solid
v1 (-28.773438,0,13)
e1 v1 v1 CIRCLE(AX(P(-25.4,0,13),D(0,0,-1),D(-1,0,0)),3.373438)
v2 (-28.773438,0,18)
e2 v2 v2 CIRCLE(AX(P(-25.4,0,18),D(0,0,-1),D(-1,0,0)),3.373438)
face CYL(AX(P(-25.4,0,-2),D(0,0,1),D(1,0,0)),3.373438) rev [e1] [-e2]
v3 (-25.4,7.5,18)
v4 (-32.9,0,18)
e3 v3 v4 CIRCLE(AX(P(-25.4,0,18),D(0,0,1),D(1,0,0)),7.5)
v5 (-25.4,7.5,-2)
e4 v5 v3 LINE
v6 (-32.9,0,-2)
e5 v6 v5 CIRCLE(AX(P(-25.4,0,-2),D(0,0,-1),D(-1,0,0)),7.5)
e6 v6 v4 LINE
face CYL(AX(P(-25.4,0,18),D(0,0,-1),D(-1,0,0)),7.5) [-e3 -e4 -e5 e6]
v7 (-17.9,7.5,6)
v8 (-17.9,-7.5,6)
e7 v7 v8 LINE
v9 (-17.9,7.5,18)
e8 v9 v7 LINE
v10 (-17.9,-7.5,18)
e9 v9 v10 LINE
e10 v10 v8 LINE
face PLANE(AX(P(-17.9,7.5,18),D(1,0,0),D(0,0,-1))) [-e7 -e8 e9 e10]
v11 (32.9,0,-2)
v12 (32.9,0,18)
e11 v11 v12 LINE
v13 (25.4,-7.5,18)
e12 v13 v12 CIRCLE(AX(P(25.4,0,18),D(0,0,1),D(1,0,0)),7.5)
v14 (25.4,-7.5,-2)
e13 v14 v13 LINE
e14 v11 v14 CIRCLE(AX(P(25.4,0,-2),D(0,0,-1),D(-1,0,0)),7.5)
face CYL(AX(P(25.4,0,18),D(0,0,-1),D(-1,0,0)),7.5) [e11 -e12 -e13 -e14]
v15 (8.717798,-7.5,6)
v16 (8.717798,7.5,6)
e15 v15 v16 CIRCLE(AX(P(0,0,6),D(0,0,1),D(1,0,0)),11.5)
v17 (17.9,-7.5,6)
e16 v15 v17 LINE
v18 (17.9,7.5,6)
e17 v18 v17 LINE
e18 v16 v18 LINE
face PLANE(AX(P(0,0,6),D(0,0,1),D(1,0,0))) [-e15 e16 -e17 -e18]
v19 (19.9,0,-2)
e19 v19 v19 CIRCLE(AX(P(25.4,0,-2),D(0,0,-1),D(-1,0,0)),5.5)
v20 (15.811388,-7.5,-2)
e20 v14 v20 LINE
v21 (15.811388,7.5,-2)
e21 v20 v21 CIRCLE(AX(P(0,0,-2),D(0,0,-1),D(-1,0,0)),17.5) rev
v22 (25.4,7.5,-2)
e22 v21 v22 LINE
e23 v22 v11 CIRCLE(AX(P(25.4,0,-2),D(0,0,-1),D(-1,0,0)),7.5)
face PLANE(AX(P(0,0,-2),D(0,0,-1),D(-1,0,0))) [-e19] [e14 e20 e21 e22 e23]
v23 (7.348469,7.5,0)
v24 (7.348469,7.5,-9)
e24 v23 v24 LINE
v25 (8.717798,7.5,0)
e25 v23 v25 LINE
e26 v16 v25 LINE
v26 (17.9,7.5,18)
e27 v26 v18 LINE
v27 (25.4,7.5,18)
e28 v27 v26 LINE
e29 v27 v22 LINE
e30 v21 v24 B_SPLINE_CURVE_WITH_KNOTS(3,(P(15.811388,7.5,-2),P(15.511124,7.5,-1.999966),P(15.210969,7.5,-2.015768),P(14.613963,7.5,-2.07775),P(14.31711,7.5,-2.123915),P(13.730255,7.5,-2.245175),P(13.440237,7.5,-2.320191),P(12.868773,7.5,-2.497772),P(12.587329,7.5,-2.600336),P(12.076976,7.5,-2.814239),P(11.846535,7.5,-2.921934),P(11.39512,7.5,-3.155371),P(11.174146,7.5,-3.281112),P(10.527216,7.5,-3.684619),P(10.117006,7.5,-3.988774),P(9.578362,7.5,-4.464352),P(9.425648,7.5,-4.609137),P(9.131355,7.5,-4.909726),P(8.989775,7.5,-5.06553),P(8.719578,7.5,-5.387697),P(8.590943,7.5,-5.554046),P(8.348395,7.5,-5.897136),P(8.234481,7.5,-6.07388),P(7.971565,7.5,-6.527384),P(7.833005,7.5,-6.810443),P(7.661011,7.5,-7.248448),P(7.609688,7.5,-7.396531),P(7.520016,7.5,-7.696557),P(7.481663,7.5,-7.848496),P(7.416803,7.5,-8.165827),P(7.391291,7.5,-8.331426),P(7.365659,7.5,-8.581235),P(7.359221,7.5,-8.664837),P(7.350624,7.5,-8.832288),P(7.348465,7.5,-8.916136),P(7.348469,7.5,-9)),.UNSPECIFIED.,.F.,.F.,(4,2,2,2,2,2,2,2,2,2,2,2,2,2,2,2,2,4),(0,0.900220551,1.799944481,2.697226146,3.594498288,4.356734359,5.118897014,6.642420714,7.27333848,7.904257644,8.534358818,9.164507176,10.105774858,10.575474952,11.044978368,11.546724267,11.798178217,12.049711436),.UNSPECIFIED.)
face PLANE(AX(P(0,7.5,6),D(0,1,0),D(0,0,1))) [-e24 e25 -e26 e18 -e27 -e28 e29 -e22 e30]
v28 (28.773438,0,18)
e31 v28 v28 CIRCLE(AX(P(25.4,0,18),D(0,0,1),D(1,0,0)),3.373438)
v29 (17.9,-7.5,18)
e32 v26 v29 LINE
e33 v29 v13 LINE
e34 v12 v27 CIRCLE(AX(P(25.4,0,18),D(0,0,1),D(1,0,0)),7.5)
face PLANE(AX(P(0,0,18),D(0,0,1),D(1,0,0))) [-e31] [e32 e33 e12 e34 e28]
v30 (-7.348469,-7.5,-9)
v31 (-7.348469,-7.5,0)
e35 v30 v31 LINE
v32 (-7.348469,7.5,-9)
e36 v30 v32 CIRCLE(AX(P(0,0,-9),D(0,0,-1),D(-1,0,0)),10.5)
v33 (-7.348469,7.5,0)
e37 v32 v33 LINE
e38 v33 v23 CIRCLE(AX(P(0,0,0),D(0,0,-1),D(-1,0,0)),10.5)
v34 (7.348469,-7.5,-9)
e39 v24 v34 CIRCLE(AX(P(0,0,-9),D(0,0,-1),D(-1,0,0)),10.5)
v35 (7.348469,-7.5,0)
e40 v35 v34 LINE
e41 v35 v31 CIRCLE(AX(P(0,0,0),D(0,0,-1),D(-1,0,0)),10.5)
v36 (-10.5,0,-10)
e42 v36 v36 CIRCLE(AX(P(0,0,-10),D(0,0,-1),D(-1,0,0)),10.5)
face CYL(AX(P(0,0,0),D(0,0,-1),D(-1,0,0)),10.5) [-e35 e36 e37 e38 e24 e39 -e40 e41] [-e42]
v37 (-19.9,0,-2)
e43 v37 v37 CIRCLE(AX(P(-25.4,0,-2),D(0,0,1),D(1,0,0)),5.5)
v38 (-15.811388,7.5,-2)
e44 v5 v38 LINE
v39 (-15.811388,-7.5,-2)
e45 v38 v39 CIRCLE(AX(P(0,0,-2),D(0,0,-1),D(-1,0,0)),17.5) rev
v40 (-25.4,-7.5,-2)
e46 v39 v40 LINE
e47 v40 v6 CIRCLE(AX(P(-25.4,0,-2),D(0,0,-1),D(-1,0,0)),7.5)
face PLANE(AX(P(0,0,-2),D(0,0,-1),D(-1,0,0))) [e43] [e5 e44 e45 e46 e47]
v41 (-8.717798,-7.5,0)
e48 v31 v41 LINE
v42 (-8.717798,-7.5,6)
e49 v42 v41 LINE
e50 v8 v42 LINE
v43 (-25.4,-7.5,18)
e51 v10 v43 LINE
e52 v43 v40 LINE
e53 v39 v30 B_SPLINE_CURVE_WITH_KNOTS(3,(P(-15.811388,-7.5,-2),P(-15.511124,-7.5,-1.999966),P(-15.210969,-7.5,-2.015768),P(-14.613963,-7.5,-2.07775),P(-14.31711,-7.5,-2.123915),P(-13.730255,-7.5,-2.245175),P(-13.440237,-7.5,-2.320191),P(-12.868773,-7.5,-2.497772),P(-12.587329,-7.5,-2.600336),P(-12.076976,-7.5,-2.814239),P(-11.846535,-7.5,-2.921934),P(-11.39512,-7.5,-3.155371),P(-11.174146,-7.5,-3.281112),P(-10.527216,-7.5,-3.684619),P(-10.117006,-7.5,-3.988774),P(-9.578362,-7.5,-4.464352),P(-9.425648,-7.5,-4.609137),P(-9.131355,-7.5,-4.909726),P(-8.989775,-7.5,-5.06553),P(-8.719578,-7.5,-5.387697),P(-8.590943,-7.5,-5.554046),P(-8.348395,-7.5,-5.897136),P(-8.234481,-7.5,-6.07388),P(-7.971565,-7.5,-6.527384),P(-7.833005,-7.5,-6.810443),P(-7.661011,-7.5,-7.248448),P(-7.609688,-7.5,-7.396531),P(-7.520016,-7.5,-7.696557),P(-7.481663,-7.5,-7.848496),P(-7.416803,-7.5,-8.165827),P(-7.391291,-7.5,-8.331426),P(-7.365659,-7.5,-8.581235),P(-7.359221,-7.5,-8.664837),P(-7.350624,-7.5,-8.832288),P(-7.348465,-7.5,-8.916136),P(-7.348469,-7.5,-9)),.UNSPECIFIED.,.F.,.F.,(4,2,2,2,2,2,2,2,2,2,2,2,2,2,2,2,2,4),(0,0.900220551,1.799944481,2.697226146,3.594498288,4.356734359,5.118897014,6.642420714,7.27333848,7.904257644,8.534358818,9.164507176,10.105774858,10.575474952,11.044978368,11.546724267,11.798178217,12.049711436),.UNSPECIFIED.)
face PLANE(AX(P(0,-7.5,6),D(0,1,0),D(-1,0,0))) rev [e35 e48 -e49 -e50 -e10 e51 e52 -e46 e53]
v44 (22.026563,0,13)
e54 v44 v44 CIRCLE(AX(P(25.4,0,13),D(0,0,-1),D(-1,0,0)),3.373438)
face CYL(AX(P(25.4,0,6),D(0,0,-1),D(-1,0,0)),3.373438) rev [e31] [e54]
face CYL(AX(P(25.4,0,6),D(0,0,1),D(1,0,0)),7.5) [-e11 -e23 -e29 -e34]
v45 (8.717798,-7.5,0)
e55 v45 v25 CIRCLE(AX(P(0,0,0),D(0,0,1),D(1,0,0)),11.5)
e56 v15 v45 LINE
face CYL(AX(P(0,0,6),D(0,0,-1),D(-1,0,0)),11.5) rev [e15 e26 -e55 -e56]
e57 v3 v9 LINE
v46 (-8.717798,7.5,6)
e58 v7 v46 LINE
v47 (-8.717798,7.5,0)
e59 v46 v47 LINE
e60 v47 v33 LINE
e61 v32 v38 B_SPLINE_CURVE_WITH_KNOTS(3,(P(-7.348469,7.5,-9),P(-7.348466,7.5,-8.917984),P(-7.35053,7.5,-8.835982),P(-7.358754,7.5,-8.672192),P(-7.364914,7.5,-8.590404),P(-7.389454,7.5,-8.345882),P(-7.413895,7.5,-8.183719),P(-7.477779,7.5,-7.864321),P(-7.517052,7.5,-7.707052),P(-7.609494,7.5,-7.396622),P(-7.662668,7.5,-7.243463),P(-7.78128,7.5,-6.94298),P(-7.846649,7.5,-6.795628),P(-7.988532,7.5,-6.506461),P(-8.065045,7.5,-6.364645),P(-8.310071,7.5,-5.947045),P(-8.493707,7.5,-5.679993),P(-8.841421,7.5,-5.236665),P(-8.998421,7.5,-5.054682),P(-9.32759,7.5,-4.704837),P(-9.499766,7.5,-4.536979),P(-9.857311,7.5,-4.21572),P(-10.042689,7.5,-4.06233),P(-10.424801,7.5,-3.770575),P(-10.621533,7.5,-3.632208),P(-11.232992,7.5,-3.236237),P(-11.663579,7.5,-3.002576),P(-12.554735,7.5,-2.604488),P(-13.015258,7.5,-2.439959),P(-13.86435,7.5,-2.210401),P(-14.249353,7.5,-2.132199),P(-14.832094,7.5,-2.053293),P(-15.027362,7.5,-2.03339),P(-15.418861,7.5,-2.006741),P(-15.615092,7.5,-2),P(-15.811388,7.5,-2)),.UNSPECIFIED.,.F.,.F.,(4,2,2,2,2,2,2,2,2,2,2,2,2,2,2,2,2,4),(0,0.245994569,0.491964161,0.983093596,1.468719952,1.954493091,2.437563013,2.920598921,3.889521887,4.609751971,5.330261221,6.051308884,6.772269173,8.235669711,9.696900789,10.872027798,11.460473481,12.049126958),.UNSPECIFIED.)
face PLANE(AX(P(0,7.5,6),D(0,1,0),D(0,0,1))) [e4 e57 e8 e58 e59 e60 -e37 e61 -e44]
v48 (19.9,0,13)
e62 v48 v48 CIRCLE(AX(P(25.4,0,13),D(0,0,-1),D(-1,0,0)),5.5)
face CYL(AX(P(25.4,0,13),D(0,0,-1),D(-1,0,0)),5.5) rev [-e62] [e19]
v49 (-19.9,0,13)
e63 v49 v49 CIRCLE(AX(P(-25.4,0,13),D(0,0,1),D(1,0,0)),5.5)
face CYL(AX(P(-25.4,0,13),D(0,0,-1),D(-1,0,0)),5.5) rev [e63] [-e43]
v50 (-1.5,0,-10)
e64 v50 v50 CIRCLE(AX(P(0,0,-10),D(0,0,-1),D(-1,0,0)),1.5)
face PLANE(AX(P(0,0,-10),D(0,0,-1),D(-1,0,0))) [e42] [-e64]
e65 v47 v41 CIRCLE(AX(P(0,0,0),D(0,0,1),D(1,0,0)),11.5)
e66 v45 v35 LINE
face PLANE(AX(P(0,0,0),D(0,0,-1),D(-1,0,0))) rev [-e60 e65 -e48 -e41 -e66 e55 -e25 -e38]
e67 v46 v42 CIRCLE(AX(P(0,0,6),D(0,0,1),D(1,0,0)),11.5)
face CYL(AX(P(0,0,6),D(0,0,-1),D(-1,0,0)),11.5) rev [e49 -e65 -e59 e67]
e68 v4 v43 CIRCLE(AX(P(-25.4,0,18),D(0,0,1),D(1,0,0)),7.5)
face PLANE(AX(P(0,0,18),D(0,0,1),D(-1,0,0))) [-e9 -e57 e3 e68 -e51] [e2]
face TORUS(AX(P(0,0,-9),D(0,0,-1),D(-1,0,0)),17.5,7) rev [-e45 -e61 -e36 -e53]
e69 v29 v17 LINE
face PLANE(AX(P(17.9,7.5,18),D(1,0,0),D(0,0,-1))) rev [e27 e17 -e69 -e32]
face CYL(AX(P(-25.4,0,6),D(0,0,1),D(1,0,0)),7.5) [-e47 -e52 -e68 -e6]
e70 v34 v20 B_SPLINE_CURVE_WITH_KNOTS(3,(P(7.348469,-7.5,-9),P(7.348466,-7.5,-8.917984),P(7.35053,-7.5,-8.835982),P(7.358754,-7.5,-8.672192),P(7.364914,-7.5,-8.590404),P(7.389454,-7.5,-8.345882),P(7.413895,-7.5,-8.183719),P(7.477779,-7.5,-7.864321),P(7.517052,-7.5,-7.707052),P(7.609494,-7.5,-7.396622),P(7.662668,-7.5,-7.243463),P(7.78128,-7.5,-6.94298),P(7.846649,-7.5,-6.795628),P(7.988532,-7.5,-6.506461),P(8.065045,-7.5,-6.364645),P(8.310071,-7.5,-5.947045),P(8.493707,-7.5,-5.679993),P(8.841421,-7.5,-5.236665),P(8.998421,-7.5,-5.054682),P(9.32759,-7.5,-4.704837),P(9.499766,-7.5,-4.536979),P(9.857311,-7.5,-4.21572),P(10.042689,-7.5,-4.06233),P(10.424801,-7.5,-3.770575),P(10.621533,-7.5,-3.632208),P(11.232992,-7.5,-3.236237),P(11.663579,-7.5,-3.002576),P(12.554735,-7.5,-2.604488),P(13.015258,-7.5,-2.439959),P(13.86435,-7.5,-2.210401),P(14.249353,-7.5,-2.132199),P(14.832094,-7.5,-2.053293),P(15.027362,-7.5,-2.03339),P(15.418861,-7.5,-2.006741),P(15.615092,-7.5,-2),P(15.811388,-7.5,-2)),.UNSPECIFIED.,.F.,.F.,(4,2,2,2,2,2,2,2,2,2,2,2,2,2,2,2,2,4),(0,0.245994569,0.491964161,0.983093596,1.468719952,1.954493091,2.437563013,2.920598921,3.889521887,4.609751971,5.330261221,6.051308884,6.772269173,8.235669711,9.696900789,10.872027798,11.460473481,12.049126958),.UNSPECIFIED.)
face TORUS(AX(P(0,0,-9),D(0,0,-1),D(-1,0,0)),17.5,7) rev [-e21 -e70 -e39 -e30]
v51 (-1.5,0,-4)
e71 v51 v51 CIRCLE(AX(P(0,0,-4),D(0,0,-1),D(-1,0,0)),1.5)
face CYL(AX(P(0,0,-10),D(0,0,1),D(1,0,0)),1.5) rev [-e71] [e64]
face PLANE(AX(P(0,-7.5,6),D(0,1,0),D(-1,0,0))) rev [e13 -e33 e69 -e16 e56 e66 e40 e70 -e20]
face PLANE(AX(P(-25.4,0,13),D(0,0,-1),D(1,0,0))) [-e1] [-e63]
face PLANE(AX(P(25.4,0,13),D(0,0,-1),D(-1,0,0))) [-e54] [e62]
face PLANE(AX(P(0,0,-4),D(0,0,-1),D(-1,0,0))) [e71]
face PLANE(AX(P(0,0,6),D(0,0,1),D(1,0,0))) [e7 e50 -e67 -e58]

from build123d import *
from build123d.topology import SkipClean

# Parameters (mm, degrees)
SKETCH1_R             = 3.3734375
BOSS_EXTRUDE1_DEPTH   = 6
BOSS_EXTRUDE1_2_DEPTH = 6
BOSS_EXTRUDE2_START   = 2
SKETCH2_R             = 3.3734375
BOSS_EXTRUDE2_DEPTH   = 2
SKETCH3_R             = 10.5
BOSS_EXTRUDE3_DEPTH   = 2
BOSS_EXTRUDE4_START   = 2
SKETCH4_R             = 10.5
BOSS_EXTRUDE4_DEPTH   = 2
BOSS_EXTRUDE5_START   = 6
SKETCH5_R             = 10.5
SKETCH5_R_2           = 1.5
BOSS_EXTRUDE5_DEPTH   = 6
FILLET1_R             = 7
SKETCH6_W             = 15
SKETCH6_H             = 15
SKETCH6_R             = 3.3734375
BOSS_EXTRUDE6_DEPTH   = 12
SKETCH7_R             = 5.5
CUT_EXTRUDE2_DEPTH    = 15
SKETCH8_W             = 8
SKETCH8_H             = 15
CUT_EXTRUDE3_DEPTH    = 5.2
SKETCH9_W             = 8
SKETCH9_H             = 15
CUT_EXTRUDE4_DEPTH    = 5.2
FILLET2_R             = 7.5


# Some blends are built 0.0001 mm under size
with BuildPart() as part:
    # Sketch1 → Boss-Extrude1 (new body)
    with BuildSketch(Plane.XY):
        with BuildLine():
            ThreePointArc((11.5, 0), (10.782037741, -3.999707758), (8.717797887, -7.5))
            Line((8.717797887, -7.5), (38.1, -7.5))
            Line((38.1, -7.5), (38.1, 7.5))
            Line((38.1, 7.5), (8.717797887, 7.5))
            ThreePointArc((8.717797887, 7.5), (10.782037741, 3.999707758), (11.5, 0))
        make_face()
        with Locations((25.4, 0)):
            Circle(SKETCH1_R, mode=Mode.SUBTRACT)
    extrude(amount=BOSS_EXTRUDE1_DEPTH)



with BuildPart() as body_2:
    # Sketch1 → Boss-Extrude1 2 (new body)
    with BuildSketch(Plane.XY):
        with BuildLine():
            Line((-38.1, 7.5), (-38.1, -7.5))
            Line((-38.1, -7.5), (-8.717797887, -7.5))
            ThreePointArc((-8.717797887, -7.5), (-11.5, 0), (-8.717797887, 7.5))
            Line((-8.717797887, 7.5), (-38.1, 7.5))
        make_face()
        with Locations((-25.4, 0)):
            Circle(SKETCH1_R, mode=Mode.SUBTRACT)
    extrude(amount=BOSS_EXTRUDE1_2_DEPTH)


with BuildPart() as part_1:
    with SkipClean():  # the faces are left unmerged after this step: merging them gives an invalid solid
        add(part.part)

        add(body_2.part)  # Boss-Extrude2 merges body 2
        # Sketch2 → Boss-Extrude2 (add)
        # profile 1 of 3: a face of its own
        with BuildSketch(Plane(origin=(0, 0, 0), x_dir=(-1, 0, 0), z_dir=(0, 0, -1)).offset(BOSS_EXTRUDE2_START)):
            with BuildLine():
                Line((-38.1, -7.5), (-8.717797887, -7.5))
                ThreePointArc((-8.717797887, -7.5), (-11.5, 0), (-8.717797887, 7.5))
                Line((-8.717797887, 7.5), (-38.1, 7.5))
                Line((-38.1, 7.5), (-38.1, -7.5))
            make_face()
            with Locations((-25.4, 0)):
                Circle(SKETCH2_R, mode=Mode.SUBTRACT)
        # profile 2 of 3: a face of its own
        with BuildSketch(Plane(origin=(0, 0, 0), x_dir=(-1, 0, 0), z_dir=(0, 0, -1)).offset(BOSS_EXTRUDE2_START)):
            with BuildLine():
                Line((-8.717797887, -7.5), (8.717797887, -7.5))
                ThreePointArc((8.717797887, -7.5), (11.5, 0), (8.717797887, 7.5))
                Line((8.717797887, 7.5), (-8.717797887, 7.5))
                ThreePointArc((-8.717797887, 7.5), (-11.5, 0), (-8.717797887, -7.5))
            make_face()
        # profile 3 of 3: a face of its own
        with BuildSketch(Plane(origin=(0, 0, 0), x_dir=(-1, 0, 0), z_dir=(0, 0, -1)).offset(BOSS_EXTRUDE2_START)):
            with BuildLine():
                ThreePointArc((8.717797887, -7.5), (11.5, 0), (8.717797887, 7.5))
                Line((8.717797887, 7.5), (38.1, 7.5))
                Line((38.1, 7.5), (38.1, -7.5))
                Line((38.1, -7.5), (8.717797887, -7.5))
            make_face()
            with Locations(Location((25.4, 0, 0), (0, 0, 180))):
                Circle(SKETCH2_R, mode=Mode.SUBTRACT)
        extrude(amount=-BOSS_EXTRUDE2_DEPTH)

    # Sketch3 → Boss-Extrude3 (add)
    with SkipClean():  # the faces are left unmerged after this step: merging them gives an invalid solid
        with BuildSketch(Plane(origin=(0, 0, -2), x_dir=(-1, 0, 0), z_dir=(0, 0, -1))):
            Circle(SKETCH3_R)
        extrude(amount=-BOSS_EXTRUDE3_DEPTH)

    # Sketch4 → Boss-Extrude4 (add)
    with SkipClean():  # the faces are left unmerged after this step: merging them gives an invalid solid
        with BuildSketch(Plane(origin=(0, 0, -2), x_dir=(-1, 0, 0), z_dir=(0, 0, -1)).offset(BOSS_EXTRUDE4_START)):
            Circle(SKETCH4_R)
        extrude(amount=-BOSS_EXTRUDE4_DEPTH)

    # Sketch5 → Boss-Extrude5 (add)
    with SkipClean():  # the faces are left unmerged after this step: merging them gives an invalid solid
        with BuildSketch(Plane(origin=(0, 0, -4), x_dir=(-1, 0, 0), z_dir=(0, 0, -1)).offset(BOSS_EXTRUDE5_START)):
            Circle(SKETCH5_R)
            Circle(SKETCH5_R_2, mode=Mode.SUBTRACT)
        extrude(amount=-BOSS_EXTRUDE5_DEPTH)

    # Fillet1
    # the kernel refuses this fillet: 7 mm, written as the material it adds along each edge
    with BuildSketch(Plane(origin=(0, 0, -2), x_dir=(-1, 0, 0), z_dir=(0, -1, 0))) as fillet1_piece_1_section:
        with BuildLine():
            CenterArc((10.5 + FILLET1_R, FILLET1_R), FILLET1_R, 180, 90)
            Line((10.5 + FILLET1_R, 0), (10.5, 0))
            Line((10.5, 0), (10.5, FILLET1_R))
        make_face()
    fillet1_piece_1 = revolve(axis=Axis((0, 0, -2), (0, 0, -1)), revolution_arc=141.087496106, mode=Mode.PRIVATE)
    fillet1_piece_1 = split(fillet1_piece_1, bisect_by=Plane(origin=(-11.14561096, 7.5, -3.604307229), z_dir=(0, -1, 0)), keep=Keep.TOP, mode=Mode.PRIVATE)
    add(fillet1_piece_1)
    with BuildSketch(Plane(origin=(0, 0, -2), x_dir=(-0.7784296665775441, 0.627731833024241, 0), z_dir=(-0.627731833024241, -0.7784296665775441, 0))) as fillet1_piece_2_section:
        with BuildLine():
            CenterArc((10.5 + FILLET1_R, FILLET1_R), FILLET1_R, 180, 90)
            Line((10.5, FILLET1_R), (10.5, 0))
            Line((10.5, 0), (10.5 + FILLET1_R, 0))
        make_face()
    fillet1_piece_2 = revolve(axis=Axis((0, 0, -2), (0, 0, -1)), revolution_arc=282.234042337, mode=Mode.PRIVATE)
    fillet1_piece_2 = split(fillet1_piece_2, bisect_by=Plane(origin=(-8.090689078, 7.5, -4.608700721), z_dir=(0, -1, 0)), keep=Keep.TOP, mode=Mode.PRIVATE)
    fillet1_piece_2 = split(fillet1_piece_2, bisect_by=Plane(origin=(-8.090689078, -7.5, -4.608700721), z_dir=(0, 1, 0)), keep=Keep.TOP, mode=Mode.PRIVATE)
    add(fillet1_piece_2)
    with BuildSketch(Plane(origin=(0, 0, -2), x_dir=(0.7781060870335762, -0.6281328818978487, 0), z_dir=(0.6281328818978487, 0.7781060870335762, 0))) as fillet1_piece_3_section:
        with BuildLine():
            CenterArc((10.5 + FILLET1_R, FILLET1_R), FILLET1_R, 180, 90)
            Line((10.5 + FILLET1_R, 0), (10.5, 0))
            Line((10.5, 0), (10.5, FILLET1_R))
        make_face()
    fillet1_piece_3 = revolve(axis=Axis((0, 0, -2), (0, 0, -1)), revolution_arc=141.087496106, mode=Mode.PRIVATE)
    fillet1_piece_3 = split(fillet1_piece_3, bisect_by=Plane(origin=(8.086917583, -7.5, -4.611323589), z_dir=(0, 1, 0)), keep=Keep.TOP, mode=Mode.PRIVATE)
    add(fillet1_piece_3)

    # Sketch6 → Boss-Extrude6 (add)
    with BuildSketch(Plane.XY.offset(6)):
        with Locations((25.4, 0)):
            Rectangle(SKETCH6_W, SKETCH6_H)
        with Locations(Location((25.4, 0, 0), (0, 0, 180))):
            Circle(SKETCH6_R, mode=Mode.SUBTRACT)
    boss_extrude6 = extrude(amount=BOSS_EXTRUDE6_DEPTH)

    # Sketch7 → Cut-Extrude2 (cut)
    with BuildSketch(Plane(origin=(0, 0, -2), x_dir=(-1, 0, 0), z_dir=(0, 0, -1))):
        with Locations((-25.4, 0)):
            Circle(SKETCH7_R)
    cut_extrude2 = extrude(amount=-CUT_EXTRUDE2_DEPTH, mode=Mode.SUBTRACT)

    # Sketch8 → Cut-Extrude3 (cut)
    with BuildSketch(Plane(origin=(38.1, 0, 0), x_dir=(0, 0, -1), z_dir=(1, 0, 0))):
        with Locations((-2, 0)):
            Rectangle(SKETCH8_W, SKETCH8_H)
    extrude(amount=-CUT_EXTRUDE3_DEPTH, mode=Mode.SUBTRACT)

    # Mirror1: Boss-Extrude6, Cut-Extrude2 across plane
    add(boss_extrude6.mirror(Plane(origin=(0, 0, 0), x_dir=(0, 0, 1), z_dir=(1, 0, 0))))
    add(cut_extrude2.mirror(Plane(origin=(0, 0, 0), x_dir=(0, 0, 1), z_dir=(1, 0, 0))), mode=Mode.SUBTRACT)

    # Sketch9 → Cut-Extrude4 (cut)
    with BuildSketch(Plane.ZY.offset(38.1)):
        with Locations((2, 0)):
            Rectangle(SKETCH9_W, SKETCH9_H)
    extrude(amount=-CUT_EXTRUDE4_DEPTH, mode=Mode.SUBTRACT)

    # Fillet2
    fillet2_edges = [part_1.edges().sort_by_distance(p)[0] for p in [
        (32.9, -7.5, 8),
        (32.9, 7.5, 8),
        (-32.9, 7.5, 8),
        (-32.9, -7.5, 8),
    ]]
    fillet(fillet2_edges, radius=FILLET2_R - 0.0001)  # a hair under: the kernel refuses the full size


solid = part_1.part
